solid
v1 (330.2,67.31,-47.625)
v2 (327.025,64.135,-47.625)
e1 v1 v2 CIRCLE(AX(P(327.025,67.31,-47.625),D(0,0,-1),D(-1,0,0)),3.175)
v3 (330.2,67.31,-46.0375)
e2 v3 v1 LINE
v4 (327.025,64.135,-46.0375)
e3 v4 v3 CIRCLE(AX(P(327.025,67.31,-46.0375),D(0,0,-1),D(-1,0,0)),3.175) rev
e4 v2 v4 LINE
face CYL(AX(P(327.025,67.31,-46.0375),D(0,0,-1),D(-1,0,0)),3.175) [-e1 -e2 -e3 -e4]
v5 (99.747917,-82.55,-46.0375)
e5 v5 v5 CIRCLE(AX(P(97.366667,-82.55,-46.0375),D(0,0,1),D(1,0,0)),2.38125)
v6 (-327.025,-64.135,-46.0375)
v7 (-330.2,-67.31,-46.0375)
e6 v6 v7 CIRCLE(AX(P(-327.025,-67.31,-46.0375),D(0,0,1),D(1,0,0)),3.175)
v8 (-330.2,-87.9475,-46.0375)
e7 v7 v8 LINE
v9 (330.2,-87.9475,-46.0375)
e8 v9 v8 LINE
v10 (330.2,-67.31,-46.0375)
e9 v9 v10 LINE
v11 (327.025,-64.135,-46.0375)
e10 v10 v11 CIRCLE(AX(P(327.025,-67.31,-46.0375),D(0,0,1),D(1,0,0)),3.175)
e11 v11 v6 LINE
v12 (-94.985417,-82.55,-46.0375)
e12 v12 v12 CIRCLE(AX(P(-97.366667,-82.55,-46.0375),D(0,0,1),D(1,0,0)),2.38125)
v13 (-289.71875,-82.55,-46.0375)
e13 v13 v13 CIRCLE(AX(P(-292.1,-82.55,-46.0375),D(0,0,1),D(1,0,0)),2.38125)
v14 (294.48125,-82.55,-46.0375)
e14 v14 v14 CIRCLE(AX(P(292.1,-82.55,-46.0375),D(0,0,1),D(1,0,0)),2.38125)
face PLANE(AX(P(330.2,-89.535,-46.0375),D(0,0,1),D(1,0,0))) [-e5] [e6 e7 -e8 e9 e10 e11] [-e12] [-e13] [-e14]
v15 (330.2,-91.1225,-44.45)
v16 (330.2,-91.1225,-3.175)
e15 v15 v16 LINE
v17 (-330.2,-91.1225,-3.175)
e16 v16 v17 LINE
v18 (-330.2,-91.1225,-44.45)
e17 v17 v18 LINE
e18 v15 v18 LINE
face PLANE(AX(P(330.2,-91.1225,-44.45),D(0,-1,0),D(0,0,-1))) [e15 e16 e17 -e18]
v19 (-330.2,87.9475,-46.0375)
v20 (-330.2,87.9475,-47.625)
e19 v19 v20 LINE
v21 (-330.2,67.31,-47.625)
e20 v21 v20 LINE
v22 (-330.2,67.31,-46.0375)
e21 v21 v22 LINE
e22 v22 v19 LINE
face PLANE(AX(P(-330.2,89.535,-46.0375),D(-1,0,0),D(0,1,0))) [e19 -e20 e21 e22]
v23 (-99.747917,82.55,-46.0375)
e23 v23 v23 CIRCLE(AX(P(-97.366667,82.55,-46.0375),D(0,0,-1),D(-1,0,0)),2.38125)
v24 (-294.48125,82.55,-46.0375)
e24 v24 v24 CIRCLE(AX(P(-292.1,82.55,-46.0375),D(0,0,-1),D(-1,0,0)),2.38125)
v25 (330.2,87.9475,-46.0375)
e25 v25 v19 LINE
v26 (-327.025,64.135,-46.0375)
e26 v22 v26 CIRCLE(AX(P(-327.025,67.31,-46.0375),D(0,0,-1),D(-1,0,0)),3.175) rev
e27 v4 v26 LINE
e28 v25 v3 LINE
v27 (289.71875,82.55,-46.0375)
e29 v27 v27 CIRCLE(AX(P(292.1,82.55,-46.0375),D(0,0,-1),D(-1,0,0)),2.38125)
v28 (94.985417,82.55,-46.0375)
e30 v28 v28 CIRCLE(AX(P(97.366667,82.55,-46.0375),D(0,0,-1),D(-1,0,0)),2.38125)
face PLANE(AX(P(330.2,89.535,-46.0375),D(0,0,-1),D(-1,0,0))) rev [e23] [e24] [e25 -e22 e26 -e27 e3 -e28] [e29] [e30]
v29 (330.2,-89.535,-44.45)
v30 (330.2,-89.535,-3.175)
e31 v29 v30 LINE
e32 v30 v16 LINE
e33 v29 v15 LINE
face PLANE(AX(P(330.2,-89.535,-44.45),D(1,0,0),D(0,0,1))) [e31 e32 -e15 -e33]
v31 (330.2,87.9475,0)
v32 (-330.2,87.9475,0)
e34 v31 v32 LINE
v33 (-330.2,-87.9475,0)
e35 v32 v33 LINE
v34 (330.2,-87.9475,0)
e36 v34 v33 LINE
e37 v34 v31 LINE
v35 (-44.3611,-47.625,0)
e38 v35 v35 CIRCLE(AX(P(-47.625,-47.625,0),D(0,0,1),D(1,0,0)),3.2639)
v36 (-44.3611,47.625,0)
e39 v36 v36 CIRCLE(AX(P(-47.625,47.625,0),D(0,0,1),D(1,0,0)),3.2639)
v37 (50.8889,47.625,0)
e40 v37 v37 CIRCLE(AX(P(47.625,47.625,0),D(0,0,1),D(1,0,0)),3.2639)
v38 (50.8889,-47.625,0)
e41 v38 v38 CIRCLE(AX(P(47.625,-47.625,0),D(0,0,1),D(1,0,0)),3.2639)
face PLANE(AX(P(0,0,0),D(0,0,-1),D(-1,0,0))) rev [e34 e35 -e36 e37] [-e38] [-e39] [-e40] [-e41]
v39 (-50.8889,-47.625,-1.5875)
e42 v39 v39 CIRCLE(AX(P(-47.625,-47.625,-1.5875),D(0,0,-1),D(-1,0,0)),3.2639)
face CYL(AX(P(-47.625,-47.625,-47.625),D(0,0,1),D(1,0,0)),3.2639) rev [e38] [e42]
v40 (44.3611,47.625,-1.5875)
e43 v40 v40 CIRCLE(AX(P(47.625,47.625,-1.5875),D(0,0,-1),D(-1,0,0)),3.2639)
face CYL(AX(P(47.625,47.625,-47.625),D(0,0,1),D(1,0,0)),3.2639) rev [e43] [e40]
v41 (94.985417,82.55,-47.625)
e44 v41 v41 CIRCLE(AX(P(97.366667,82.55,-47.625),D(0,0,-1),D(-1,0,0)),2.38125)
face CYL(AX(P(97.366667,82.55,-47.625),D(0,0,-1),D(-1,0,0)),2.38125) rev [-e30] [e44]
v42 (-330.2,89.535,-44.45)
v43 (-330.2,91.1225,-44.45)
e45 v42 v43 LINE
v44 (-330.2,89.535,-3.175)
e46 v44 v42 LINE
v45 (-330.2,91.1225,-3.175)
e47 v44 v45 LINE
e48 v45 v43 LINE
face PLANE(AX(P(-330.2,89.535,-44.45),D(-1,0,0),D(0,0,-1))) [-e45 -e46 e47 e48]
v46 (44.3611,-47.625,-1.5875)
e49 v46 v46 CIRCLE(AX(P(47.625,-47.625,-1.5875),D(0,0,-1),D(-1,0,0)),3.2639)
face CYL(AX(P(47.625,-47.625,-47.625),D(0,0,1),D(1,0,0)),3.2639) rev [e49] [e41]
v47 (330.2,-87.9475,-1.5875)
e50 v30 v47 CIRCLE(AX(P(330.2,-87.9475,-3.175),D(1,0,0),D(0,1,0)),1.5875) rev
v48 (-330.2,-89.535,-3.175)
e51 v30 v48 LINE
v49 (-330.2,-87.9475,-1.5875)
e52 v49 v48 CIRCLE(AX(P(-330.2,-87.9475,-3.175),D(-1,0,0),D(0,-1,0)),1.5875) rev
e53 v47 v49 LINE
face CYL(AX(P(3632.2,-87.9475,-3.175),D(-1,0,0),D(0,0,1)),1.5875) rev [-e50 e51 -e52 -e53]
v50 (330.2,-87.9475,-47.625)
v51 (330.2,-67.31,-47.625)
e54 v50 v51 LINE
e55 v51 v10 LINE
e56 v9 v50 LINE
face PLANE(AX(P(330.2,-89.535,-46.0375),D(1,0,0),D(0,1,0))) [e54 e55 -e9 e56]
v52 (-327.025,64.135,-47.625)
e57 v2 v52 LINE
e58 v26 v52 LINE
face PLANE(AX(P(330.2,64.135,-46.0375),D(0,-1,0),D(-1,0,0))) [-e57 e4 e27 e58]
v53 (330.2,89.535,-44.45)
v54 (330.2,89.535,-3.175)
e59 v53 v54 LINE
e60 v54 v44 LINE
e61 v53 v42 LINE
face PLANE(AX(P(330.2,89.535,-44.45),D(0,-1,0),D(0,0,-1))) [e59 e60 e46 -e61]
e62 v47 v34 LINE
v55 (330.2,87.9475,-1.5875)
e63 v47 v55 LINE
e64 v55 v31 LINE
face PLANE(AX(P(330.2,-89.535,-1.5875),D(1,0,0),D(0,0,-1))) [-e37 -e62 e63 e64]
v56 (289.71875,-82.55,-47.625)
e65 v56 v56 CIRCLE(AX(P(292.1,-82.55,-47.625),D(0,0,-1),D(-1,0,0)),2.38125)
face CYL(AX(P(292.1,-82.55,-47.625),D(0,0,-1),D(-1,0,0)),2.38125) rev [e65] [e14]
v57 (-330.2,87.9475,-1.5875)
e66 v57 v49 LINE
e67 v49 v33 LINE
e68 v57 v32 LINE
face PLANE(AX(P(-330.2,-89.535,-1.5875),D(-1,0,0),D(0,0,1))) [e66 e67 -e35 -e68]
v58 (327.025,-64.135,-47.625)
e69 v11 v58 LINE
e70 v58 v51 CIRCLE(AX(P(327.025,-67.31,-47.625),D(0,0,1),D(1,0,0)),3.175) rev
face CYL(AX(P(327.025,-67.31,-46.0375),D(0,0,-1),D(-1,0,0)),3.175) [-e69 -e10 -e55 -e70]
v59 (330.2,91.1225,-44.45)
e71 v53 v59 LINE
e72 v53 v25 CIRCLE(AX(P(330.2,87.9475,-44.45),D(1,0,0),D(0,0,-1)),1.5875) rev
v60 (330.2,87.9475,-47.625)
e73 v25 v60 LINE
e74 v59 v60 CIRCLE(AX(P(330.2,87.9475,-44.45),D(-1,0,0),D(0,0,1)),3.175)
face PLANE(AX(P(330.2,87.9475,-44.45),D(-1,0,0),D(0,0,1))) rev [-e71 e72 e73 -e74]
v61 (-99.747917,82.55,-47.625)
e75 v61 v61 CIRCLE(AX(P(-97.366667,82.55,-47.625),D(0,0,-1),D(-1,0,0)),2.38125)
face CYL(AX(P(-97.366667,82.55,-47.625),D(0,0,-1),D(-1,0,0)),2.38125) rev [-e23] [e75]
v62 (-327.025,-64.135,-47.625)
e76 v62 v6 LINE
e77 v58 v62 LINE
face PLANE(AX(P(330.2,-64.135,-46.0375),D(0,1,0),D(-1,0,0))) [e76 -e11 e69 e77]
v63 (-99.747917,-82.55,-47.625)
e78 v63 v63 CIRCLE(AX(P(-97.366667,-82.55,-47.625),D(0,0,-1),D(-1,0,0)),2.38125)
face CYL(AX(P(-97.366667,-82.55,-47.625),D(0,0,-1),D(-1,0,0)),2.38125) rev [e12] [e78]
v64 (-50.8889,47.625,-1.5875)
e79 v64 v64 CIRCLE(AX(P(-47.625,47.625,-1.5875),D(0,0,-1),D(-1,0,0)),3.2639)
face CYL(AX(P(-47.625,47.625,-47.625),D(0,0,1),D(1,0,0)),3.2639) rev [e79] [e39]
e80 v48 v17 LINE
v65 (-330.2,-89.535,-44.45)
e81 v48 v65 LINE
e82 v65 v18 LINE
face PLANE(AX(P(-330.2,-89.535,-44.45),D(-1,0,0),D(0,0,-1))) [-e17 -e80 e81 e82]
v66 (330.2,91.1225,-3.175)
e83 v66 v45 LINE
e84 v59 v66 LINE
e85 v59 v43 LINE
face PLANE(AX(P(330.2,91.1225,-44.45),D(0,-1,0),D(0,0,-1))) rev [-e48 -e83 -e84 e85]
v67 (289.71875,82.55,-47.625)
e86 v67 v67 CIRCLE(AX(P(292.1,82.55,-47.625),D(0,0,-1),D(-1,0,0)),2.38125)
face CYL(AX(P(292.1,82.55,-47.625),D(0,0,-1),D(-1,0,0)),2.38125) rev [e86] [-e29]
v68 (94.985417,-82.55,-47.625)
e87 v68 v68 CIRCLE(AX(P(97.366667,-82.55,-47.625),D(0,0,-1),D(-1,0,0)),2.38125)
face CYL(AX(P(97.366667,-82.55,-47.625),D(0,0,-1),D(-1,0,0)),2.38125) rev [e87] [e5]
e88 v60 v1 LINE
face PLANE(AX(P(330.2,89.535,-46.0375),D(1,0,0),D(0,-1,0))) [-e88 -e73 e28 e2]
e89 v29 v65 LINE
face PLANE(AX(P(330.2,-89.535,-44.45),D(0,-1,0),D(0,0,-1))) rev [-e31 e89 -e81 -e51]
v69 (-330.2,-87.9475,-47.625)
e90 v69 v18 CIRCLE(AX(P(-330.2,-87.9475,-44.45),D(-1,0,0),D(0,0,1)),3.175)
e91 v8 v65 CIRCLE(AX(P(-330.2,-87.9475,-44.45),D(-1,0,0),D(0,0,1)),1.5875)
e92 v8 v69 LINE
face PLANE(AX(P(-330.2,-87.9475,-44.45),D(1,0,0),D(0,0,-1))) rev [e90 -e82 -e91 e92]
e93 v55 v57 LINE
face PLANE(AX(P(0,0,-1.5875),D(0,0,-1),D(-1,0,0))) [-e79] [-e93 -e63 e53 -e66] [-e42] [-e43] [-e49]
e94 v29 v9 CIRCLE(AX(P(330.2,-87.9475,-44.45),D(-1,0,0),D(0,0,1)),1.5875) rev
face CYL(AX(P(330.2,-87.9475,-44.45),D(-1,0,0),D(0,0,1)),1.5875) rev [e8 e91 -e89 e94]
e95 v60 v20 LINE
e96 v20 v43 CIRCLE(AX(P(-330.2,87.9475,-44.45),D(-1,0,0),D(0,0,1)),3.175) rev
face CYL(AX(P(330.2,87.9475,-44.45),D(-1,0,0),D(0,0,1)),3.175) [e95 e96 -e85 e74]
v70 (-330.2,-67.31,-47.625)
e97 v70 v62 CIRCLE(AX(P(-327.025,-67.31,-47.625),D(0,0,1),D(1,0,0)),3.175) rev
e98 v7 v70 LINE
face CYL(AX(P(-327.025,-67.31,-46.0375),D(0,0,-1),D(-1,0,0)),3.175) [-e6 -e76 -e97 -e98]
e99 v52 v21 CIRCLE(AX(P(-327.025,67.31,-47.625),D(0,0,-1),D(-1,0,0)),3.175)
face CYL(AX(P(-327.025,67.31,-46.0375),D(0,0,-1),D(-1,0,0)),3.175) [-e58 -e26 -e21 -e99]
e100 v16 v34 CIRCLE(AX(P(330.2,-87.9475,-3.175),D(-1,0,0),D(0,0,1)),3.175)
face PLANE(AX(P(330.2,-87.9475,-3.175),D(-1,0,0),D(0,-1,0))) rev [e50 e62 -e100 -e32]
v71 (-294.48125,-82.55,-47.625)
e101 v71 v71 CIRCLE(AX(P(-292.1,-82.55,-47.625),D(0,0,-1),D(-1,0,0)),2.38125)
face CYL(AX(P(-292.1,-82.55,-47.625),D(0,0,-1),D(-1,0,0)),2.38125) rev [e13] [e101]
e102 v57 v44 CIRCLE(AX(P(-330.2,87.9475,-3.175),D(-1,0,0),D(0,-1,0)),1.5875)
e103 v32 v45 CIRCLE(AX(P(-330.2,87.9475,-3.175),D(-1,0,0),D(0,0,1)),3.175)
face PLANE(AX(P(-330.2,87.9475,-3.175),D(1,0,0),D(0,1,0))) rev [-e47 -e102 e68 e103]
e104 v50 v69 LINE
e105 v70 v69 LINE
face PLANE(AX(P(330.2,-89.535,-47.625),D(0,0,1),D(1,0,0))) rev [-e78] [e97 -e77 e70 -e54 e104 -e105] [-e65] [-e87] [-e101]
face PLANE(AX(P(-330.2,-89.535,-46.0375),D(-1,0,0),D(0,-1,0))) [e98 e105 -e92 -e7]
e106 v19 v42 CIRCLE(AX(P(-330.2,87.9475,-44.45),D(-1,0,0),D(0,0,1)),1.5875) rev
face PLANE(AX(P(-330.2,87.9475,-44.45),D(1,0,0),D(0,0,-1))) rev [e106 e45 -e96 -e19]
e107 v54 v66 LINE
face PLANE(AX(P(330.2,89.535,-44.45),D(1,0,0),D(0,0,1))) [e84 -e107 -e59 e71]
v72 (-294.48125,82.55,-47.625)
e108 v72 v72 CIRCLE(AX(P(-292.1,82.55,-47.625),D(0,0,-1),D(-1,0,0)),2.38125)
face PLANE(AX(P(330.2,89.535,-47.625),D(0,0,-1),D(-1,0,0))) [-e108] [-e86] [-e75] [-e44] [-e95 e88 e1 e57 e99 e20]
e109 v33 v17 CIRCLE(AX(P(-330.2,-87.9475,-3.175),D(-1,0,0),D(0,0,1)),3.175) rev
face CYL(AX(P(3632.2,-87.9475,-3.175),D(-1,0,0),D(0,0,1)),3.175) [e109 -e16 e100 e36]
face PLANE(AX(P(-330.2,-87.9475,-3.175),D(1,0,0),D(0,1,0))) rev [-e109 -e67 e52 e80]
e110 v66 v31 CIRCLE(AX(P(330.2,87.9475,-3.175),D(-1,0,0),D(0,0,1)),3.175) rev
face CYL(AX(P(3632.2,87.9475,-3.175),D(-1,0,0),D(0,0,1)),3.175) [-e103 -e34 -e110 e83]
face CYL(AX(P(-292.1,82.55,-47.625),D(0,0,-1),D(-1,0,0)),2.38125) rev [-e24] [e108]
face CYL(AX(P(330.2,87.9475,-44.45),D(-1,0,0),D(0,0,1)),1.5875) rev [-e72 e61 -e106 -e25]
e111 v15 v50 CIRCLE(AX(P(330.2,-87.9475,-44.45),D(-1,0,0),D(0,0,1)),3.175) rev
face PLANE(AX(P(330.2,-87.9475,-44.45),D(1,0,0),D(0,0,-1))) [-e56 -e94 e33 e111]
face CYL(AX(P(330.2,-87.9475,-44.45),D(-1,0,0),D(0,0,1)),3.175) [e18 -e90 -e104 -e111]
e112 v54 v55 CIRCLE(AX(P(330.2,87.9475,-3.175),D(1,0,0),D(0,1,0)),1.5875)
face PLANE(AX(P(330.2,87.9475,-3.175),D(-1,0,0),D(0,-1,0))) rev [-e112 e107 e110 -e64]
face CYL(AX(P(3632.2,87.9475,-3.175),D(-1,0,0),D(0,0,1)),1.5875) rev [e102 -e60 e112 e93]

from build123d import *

# Parameters (mm, degrees)
SKETCH1_W                          = 660.4
SKETCH1_H                          = 179.07
BASE_FLANGE1_DEPTH                 = 1.5875
MITER_START                        = -330.2
MITER_FLANGE1_DEPTH                = 660.4
MITER_FLANGE1_2_DEPTH              = 660.4
F_3_16_0_1875_DIAMETER_HOLE1_D     = 4.7625
F_3_16_0_1875_DIAMETER_HOLE1_DEPTH = 5.1054
F_3_16_0_1875_DIAMETER_HOLE1_TIP   = 1.430799349
SKETCH25_R                         = 3.2639
CUT_EXTRUDE1_DEPTH                 = 346.837375989
FILLET1_R                          = 3.175


# Read off the part's stored shape, not the designer's step: Miter Flange1
# Sheet-metal steps are written as plain solids
with BuildPart() as part:
    # Sketch1 → Base-Flange1 (new body)
    with BuildSketch(Plane.XY):
        Rectangle(SKETCH1_W, SKETCH1_H)
    extrude(amount=-BASE_FLANGE1_DEPTH)

    # Miter Flange1 outline → Miter Flange1 (cut)
    with BuildSketch(Plane.YZ.offset(MITER_START)):
        with BuildLine():
            ThreePointArc((87.9475, 0), (88.769250468, -0.108185502), (89.535, -0.425369343))
            Line((89.535, -0.425369343), (89.535, 0))
            Line((89.535, 0), (87.9475, 0))
        make_face()
    miter_flange1 = extrude(amount=MITER_FLANGE1_DEPTH, mode=Mode.SUBTRACT)

    # Miter Flange1 2 outline → Miter Flange1 2 (add)
    with BuildSketch(Plane.YZ.offset(MITER_START)):
        with BuildLine():
            Line((87.9475, -46.0375), (64.135, -46.0375))
            Line((64.135, -46.0375), (64.135, -47.625))
            Line((64.135, -47.625), (87.9475, -47.625))
            ThreePointArc((87.9475, -47.625), (90.19256403, -46.69506403), (91.1225, -44.45))
            Line((91.1225, -44.45), (91.1225, -3.175))
            ThreePointArc((91.1225, -3.175), (90.697130657, -1.5875), (89.535, -0.425369343))
            Line((89.535, -0.425369343), (89.535, -1.5875))
            Line((89.535, -1.5875), (87.9475, -1.5875))
            ThreePointArc((87.9475, -1.5875), (89.070032015, -2.052467985), (89.535, -3.175))
            Line((89.535, -3.175), (89.535, -44.45))
            ThreePointArc((89.535, -44.45), (89.070032015, -45.572532015), (87.9475, -46.0375))
        make_face()
    miter_flange1_2 = extrude(amount=MITER_FLANGE1_2_DEPTH)

    # Mirror1: Miter Flange1, Miter Flange1 2 across plane
    add(miter_flange1.mirror(Plane.ZX), mode=Mode.SUBTRACT)
    add(miter_flange1_2.mirror(Plane.ZX))

    # 3/16 (0.1875) Diameter Hole1
    with Locations(Plane(origin=(0, 0, -47.625), x_dir=(-1, 0, 0), z_dir=(0, 0, -1))):
        with Locations((-292.1, 82.55), (-292.1, -82.55), (-97.366666667, 82.55), (-97.366666667, -82.55), (97.366666667, 82.55), (97.366666667, -82.55), (292.1, -82.55), (292.1, 82.55)):
            Hole(F_3_16_0_1875_DIAMETER_HOLE1_D / 2, depth=F_3_16_0_1875_DIAMETER_HOLE1_DEPTH)
            with Locations((0, 0, -(F_3_16_0_1875_DIAMETER_HOLE1_DEPTH + F_3_16_0_1875_DIAMETER_HOLE1_TIP / 2))):  # 118° drill point
                Cone(0, F_3_16_0_1875_DIAMETER_HOLE1_D / 2, F_3_16_0_1875_DIAMETER_HOLE1_TIP, mode=Mode.SUBTRACT)

    # Sketch25 → Cut-Extrude1 (cut, through all)
    with BuildSketch(Plane.XY):
        with Locations((47.625, 47.625)):
            Circle(SKETCH25_R)
        with Locations((47.625, -47.625)):
            Circle(SKETCH25_R)
        with Locations((-47.625, -47.625)):
            Circle(SKETCH25_R)
        with Locations((-47.625, 47.625)):
            Circle(SKETCH25_R)
    extrude(amount=-CUT_EXTRUDE1_DEPTH, mode=Mode.SUBTRACT)

    # Fillet1
    fillet1_edges = [part.edges().sort_by_distance(p)[0] for p in [
        (330.2, 64.135, -46.83125),
        (-330.2, 64.135, -46.83125),
        (330.2, -64.135, -46.83125),
        (-330.2, -64.135, -46.83125),
    ]]
    fillet(fillet1_edges, radius=FILLET1_R)


solid = part.part
